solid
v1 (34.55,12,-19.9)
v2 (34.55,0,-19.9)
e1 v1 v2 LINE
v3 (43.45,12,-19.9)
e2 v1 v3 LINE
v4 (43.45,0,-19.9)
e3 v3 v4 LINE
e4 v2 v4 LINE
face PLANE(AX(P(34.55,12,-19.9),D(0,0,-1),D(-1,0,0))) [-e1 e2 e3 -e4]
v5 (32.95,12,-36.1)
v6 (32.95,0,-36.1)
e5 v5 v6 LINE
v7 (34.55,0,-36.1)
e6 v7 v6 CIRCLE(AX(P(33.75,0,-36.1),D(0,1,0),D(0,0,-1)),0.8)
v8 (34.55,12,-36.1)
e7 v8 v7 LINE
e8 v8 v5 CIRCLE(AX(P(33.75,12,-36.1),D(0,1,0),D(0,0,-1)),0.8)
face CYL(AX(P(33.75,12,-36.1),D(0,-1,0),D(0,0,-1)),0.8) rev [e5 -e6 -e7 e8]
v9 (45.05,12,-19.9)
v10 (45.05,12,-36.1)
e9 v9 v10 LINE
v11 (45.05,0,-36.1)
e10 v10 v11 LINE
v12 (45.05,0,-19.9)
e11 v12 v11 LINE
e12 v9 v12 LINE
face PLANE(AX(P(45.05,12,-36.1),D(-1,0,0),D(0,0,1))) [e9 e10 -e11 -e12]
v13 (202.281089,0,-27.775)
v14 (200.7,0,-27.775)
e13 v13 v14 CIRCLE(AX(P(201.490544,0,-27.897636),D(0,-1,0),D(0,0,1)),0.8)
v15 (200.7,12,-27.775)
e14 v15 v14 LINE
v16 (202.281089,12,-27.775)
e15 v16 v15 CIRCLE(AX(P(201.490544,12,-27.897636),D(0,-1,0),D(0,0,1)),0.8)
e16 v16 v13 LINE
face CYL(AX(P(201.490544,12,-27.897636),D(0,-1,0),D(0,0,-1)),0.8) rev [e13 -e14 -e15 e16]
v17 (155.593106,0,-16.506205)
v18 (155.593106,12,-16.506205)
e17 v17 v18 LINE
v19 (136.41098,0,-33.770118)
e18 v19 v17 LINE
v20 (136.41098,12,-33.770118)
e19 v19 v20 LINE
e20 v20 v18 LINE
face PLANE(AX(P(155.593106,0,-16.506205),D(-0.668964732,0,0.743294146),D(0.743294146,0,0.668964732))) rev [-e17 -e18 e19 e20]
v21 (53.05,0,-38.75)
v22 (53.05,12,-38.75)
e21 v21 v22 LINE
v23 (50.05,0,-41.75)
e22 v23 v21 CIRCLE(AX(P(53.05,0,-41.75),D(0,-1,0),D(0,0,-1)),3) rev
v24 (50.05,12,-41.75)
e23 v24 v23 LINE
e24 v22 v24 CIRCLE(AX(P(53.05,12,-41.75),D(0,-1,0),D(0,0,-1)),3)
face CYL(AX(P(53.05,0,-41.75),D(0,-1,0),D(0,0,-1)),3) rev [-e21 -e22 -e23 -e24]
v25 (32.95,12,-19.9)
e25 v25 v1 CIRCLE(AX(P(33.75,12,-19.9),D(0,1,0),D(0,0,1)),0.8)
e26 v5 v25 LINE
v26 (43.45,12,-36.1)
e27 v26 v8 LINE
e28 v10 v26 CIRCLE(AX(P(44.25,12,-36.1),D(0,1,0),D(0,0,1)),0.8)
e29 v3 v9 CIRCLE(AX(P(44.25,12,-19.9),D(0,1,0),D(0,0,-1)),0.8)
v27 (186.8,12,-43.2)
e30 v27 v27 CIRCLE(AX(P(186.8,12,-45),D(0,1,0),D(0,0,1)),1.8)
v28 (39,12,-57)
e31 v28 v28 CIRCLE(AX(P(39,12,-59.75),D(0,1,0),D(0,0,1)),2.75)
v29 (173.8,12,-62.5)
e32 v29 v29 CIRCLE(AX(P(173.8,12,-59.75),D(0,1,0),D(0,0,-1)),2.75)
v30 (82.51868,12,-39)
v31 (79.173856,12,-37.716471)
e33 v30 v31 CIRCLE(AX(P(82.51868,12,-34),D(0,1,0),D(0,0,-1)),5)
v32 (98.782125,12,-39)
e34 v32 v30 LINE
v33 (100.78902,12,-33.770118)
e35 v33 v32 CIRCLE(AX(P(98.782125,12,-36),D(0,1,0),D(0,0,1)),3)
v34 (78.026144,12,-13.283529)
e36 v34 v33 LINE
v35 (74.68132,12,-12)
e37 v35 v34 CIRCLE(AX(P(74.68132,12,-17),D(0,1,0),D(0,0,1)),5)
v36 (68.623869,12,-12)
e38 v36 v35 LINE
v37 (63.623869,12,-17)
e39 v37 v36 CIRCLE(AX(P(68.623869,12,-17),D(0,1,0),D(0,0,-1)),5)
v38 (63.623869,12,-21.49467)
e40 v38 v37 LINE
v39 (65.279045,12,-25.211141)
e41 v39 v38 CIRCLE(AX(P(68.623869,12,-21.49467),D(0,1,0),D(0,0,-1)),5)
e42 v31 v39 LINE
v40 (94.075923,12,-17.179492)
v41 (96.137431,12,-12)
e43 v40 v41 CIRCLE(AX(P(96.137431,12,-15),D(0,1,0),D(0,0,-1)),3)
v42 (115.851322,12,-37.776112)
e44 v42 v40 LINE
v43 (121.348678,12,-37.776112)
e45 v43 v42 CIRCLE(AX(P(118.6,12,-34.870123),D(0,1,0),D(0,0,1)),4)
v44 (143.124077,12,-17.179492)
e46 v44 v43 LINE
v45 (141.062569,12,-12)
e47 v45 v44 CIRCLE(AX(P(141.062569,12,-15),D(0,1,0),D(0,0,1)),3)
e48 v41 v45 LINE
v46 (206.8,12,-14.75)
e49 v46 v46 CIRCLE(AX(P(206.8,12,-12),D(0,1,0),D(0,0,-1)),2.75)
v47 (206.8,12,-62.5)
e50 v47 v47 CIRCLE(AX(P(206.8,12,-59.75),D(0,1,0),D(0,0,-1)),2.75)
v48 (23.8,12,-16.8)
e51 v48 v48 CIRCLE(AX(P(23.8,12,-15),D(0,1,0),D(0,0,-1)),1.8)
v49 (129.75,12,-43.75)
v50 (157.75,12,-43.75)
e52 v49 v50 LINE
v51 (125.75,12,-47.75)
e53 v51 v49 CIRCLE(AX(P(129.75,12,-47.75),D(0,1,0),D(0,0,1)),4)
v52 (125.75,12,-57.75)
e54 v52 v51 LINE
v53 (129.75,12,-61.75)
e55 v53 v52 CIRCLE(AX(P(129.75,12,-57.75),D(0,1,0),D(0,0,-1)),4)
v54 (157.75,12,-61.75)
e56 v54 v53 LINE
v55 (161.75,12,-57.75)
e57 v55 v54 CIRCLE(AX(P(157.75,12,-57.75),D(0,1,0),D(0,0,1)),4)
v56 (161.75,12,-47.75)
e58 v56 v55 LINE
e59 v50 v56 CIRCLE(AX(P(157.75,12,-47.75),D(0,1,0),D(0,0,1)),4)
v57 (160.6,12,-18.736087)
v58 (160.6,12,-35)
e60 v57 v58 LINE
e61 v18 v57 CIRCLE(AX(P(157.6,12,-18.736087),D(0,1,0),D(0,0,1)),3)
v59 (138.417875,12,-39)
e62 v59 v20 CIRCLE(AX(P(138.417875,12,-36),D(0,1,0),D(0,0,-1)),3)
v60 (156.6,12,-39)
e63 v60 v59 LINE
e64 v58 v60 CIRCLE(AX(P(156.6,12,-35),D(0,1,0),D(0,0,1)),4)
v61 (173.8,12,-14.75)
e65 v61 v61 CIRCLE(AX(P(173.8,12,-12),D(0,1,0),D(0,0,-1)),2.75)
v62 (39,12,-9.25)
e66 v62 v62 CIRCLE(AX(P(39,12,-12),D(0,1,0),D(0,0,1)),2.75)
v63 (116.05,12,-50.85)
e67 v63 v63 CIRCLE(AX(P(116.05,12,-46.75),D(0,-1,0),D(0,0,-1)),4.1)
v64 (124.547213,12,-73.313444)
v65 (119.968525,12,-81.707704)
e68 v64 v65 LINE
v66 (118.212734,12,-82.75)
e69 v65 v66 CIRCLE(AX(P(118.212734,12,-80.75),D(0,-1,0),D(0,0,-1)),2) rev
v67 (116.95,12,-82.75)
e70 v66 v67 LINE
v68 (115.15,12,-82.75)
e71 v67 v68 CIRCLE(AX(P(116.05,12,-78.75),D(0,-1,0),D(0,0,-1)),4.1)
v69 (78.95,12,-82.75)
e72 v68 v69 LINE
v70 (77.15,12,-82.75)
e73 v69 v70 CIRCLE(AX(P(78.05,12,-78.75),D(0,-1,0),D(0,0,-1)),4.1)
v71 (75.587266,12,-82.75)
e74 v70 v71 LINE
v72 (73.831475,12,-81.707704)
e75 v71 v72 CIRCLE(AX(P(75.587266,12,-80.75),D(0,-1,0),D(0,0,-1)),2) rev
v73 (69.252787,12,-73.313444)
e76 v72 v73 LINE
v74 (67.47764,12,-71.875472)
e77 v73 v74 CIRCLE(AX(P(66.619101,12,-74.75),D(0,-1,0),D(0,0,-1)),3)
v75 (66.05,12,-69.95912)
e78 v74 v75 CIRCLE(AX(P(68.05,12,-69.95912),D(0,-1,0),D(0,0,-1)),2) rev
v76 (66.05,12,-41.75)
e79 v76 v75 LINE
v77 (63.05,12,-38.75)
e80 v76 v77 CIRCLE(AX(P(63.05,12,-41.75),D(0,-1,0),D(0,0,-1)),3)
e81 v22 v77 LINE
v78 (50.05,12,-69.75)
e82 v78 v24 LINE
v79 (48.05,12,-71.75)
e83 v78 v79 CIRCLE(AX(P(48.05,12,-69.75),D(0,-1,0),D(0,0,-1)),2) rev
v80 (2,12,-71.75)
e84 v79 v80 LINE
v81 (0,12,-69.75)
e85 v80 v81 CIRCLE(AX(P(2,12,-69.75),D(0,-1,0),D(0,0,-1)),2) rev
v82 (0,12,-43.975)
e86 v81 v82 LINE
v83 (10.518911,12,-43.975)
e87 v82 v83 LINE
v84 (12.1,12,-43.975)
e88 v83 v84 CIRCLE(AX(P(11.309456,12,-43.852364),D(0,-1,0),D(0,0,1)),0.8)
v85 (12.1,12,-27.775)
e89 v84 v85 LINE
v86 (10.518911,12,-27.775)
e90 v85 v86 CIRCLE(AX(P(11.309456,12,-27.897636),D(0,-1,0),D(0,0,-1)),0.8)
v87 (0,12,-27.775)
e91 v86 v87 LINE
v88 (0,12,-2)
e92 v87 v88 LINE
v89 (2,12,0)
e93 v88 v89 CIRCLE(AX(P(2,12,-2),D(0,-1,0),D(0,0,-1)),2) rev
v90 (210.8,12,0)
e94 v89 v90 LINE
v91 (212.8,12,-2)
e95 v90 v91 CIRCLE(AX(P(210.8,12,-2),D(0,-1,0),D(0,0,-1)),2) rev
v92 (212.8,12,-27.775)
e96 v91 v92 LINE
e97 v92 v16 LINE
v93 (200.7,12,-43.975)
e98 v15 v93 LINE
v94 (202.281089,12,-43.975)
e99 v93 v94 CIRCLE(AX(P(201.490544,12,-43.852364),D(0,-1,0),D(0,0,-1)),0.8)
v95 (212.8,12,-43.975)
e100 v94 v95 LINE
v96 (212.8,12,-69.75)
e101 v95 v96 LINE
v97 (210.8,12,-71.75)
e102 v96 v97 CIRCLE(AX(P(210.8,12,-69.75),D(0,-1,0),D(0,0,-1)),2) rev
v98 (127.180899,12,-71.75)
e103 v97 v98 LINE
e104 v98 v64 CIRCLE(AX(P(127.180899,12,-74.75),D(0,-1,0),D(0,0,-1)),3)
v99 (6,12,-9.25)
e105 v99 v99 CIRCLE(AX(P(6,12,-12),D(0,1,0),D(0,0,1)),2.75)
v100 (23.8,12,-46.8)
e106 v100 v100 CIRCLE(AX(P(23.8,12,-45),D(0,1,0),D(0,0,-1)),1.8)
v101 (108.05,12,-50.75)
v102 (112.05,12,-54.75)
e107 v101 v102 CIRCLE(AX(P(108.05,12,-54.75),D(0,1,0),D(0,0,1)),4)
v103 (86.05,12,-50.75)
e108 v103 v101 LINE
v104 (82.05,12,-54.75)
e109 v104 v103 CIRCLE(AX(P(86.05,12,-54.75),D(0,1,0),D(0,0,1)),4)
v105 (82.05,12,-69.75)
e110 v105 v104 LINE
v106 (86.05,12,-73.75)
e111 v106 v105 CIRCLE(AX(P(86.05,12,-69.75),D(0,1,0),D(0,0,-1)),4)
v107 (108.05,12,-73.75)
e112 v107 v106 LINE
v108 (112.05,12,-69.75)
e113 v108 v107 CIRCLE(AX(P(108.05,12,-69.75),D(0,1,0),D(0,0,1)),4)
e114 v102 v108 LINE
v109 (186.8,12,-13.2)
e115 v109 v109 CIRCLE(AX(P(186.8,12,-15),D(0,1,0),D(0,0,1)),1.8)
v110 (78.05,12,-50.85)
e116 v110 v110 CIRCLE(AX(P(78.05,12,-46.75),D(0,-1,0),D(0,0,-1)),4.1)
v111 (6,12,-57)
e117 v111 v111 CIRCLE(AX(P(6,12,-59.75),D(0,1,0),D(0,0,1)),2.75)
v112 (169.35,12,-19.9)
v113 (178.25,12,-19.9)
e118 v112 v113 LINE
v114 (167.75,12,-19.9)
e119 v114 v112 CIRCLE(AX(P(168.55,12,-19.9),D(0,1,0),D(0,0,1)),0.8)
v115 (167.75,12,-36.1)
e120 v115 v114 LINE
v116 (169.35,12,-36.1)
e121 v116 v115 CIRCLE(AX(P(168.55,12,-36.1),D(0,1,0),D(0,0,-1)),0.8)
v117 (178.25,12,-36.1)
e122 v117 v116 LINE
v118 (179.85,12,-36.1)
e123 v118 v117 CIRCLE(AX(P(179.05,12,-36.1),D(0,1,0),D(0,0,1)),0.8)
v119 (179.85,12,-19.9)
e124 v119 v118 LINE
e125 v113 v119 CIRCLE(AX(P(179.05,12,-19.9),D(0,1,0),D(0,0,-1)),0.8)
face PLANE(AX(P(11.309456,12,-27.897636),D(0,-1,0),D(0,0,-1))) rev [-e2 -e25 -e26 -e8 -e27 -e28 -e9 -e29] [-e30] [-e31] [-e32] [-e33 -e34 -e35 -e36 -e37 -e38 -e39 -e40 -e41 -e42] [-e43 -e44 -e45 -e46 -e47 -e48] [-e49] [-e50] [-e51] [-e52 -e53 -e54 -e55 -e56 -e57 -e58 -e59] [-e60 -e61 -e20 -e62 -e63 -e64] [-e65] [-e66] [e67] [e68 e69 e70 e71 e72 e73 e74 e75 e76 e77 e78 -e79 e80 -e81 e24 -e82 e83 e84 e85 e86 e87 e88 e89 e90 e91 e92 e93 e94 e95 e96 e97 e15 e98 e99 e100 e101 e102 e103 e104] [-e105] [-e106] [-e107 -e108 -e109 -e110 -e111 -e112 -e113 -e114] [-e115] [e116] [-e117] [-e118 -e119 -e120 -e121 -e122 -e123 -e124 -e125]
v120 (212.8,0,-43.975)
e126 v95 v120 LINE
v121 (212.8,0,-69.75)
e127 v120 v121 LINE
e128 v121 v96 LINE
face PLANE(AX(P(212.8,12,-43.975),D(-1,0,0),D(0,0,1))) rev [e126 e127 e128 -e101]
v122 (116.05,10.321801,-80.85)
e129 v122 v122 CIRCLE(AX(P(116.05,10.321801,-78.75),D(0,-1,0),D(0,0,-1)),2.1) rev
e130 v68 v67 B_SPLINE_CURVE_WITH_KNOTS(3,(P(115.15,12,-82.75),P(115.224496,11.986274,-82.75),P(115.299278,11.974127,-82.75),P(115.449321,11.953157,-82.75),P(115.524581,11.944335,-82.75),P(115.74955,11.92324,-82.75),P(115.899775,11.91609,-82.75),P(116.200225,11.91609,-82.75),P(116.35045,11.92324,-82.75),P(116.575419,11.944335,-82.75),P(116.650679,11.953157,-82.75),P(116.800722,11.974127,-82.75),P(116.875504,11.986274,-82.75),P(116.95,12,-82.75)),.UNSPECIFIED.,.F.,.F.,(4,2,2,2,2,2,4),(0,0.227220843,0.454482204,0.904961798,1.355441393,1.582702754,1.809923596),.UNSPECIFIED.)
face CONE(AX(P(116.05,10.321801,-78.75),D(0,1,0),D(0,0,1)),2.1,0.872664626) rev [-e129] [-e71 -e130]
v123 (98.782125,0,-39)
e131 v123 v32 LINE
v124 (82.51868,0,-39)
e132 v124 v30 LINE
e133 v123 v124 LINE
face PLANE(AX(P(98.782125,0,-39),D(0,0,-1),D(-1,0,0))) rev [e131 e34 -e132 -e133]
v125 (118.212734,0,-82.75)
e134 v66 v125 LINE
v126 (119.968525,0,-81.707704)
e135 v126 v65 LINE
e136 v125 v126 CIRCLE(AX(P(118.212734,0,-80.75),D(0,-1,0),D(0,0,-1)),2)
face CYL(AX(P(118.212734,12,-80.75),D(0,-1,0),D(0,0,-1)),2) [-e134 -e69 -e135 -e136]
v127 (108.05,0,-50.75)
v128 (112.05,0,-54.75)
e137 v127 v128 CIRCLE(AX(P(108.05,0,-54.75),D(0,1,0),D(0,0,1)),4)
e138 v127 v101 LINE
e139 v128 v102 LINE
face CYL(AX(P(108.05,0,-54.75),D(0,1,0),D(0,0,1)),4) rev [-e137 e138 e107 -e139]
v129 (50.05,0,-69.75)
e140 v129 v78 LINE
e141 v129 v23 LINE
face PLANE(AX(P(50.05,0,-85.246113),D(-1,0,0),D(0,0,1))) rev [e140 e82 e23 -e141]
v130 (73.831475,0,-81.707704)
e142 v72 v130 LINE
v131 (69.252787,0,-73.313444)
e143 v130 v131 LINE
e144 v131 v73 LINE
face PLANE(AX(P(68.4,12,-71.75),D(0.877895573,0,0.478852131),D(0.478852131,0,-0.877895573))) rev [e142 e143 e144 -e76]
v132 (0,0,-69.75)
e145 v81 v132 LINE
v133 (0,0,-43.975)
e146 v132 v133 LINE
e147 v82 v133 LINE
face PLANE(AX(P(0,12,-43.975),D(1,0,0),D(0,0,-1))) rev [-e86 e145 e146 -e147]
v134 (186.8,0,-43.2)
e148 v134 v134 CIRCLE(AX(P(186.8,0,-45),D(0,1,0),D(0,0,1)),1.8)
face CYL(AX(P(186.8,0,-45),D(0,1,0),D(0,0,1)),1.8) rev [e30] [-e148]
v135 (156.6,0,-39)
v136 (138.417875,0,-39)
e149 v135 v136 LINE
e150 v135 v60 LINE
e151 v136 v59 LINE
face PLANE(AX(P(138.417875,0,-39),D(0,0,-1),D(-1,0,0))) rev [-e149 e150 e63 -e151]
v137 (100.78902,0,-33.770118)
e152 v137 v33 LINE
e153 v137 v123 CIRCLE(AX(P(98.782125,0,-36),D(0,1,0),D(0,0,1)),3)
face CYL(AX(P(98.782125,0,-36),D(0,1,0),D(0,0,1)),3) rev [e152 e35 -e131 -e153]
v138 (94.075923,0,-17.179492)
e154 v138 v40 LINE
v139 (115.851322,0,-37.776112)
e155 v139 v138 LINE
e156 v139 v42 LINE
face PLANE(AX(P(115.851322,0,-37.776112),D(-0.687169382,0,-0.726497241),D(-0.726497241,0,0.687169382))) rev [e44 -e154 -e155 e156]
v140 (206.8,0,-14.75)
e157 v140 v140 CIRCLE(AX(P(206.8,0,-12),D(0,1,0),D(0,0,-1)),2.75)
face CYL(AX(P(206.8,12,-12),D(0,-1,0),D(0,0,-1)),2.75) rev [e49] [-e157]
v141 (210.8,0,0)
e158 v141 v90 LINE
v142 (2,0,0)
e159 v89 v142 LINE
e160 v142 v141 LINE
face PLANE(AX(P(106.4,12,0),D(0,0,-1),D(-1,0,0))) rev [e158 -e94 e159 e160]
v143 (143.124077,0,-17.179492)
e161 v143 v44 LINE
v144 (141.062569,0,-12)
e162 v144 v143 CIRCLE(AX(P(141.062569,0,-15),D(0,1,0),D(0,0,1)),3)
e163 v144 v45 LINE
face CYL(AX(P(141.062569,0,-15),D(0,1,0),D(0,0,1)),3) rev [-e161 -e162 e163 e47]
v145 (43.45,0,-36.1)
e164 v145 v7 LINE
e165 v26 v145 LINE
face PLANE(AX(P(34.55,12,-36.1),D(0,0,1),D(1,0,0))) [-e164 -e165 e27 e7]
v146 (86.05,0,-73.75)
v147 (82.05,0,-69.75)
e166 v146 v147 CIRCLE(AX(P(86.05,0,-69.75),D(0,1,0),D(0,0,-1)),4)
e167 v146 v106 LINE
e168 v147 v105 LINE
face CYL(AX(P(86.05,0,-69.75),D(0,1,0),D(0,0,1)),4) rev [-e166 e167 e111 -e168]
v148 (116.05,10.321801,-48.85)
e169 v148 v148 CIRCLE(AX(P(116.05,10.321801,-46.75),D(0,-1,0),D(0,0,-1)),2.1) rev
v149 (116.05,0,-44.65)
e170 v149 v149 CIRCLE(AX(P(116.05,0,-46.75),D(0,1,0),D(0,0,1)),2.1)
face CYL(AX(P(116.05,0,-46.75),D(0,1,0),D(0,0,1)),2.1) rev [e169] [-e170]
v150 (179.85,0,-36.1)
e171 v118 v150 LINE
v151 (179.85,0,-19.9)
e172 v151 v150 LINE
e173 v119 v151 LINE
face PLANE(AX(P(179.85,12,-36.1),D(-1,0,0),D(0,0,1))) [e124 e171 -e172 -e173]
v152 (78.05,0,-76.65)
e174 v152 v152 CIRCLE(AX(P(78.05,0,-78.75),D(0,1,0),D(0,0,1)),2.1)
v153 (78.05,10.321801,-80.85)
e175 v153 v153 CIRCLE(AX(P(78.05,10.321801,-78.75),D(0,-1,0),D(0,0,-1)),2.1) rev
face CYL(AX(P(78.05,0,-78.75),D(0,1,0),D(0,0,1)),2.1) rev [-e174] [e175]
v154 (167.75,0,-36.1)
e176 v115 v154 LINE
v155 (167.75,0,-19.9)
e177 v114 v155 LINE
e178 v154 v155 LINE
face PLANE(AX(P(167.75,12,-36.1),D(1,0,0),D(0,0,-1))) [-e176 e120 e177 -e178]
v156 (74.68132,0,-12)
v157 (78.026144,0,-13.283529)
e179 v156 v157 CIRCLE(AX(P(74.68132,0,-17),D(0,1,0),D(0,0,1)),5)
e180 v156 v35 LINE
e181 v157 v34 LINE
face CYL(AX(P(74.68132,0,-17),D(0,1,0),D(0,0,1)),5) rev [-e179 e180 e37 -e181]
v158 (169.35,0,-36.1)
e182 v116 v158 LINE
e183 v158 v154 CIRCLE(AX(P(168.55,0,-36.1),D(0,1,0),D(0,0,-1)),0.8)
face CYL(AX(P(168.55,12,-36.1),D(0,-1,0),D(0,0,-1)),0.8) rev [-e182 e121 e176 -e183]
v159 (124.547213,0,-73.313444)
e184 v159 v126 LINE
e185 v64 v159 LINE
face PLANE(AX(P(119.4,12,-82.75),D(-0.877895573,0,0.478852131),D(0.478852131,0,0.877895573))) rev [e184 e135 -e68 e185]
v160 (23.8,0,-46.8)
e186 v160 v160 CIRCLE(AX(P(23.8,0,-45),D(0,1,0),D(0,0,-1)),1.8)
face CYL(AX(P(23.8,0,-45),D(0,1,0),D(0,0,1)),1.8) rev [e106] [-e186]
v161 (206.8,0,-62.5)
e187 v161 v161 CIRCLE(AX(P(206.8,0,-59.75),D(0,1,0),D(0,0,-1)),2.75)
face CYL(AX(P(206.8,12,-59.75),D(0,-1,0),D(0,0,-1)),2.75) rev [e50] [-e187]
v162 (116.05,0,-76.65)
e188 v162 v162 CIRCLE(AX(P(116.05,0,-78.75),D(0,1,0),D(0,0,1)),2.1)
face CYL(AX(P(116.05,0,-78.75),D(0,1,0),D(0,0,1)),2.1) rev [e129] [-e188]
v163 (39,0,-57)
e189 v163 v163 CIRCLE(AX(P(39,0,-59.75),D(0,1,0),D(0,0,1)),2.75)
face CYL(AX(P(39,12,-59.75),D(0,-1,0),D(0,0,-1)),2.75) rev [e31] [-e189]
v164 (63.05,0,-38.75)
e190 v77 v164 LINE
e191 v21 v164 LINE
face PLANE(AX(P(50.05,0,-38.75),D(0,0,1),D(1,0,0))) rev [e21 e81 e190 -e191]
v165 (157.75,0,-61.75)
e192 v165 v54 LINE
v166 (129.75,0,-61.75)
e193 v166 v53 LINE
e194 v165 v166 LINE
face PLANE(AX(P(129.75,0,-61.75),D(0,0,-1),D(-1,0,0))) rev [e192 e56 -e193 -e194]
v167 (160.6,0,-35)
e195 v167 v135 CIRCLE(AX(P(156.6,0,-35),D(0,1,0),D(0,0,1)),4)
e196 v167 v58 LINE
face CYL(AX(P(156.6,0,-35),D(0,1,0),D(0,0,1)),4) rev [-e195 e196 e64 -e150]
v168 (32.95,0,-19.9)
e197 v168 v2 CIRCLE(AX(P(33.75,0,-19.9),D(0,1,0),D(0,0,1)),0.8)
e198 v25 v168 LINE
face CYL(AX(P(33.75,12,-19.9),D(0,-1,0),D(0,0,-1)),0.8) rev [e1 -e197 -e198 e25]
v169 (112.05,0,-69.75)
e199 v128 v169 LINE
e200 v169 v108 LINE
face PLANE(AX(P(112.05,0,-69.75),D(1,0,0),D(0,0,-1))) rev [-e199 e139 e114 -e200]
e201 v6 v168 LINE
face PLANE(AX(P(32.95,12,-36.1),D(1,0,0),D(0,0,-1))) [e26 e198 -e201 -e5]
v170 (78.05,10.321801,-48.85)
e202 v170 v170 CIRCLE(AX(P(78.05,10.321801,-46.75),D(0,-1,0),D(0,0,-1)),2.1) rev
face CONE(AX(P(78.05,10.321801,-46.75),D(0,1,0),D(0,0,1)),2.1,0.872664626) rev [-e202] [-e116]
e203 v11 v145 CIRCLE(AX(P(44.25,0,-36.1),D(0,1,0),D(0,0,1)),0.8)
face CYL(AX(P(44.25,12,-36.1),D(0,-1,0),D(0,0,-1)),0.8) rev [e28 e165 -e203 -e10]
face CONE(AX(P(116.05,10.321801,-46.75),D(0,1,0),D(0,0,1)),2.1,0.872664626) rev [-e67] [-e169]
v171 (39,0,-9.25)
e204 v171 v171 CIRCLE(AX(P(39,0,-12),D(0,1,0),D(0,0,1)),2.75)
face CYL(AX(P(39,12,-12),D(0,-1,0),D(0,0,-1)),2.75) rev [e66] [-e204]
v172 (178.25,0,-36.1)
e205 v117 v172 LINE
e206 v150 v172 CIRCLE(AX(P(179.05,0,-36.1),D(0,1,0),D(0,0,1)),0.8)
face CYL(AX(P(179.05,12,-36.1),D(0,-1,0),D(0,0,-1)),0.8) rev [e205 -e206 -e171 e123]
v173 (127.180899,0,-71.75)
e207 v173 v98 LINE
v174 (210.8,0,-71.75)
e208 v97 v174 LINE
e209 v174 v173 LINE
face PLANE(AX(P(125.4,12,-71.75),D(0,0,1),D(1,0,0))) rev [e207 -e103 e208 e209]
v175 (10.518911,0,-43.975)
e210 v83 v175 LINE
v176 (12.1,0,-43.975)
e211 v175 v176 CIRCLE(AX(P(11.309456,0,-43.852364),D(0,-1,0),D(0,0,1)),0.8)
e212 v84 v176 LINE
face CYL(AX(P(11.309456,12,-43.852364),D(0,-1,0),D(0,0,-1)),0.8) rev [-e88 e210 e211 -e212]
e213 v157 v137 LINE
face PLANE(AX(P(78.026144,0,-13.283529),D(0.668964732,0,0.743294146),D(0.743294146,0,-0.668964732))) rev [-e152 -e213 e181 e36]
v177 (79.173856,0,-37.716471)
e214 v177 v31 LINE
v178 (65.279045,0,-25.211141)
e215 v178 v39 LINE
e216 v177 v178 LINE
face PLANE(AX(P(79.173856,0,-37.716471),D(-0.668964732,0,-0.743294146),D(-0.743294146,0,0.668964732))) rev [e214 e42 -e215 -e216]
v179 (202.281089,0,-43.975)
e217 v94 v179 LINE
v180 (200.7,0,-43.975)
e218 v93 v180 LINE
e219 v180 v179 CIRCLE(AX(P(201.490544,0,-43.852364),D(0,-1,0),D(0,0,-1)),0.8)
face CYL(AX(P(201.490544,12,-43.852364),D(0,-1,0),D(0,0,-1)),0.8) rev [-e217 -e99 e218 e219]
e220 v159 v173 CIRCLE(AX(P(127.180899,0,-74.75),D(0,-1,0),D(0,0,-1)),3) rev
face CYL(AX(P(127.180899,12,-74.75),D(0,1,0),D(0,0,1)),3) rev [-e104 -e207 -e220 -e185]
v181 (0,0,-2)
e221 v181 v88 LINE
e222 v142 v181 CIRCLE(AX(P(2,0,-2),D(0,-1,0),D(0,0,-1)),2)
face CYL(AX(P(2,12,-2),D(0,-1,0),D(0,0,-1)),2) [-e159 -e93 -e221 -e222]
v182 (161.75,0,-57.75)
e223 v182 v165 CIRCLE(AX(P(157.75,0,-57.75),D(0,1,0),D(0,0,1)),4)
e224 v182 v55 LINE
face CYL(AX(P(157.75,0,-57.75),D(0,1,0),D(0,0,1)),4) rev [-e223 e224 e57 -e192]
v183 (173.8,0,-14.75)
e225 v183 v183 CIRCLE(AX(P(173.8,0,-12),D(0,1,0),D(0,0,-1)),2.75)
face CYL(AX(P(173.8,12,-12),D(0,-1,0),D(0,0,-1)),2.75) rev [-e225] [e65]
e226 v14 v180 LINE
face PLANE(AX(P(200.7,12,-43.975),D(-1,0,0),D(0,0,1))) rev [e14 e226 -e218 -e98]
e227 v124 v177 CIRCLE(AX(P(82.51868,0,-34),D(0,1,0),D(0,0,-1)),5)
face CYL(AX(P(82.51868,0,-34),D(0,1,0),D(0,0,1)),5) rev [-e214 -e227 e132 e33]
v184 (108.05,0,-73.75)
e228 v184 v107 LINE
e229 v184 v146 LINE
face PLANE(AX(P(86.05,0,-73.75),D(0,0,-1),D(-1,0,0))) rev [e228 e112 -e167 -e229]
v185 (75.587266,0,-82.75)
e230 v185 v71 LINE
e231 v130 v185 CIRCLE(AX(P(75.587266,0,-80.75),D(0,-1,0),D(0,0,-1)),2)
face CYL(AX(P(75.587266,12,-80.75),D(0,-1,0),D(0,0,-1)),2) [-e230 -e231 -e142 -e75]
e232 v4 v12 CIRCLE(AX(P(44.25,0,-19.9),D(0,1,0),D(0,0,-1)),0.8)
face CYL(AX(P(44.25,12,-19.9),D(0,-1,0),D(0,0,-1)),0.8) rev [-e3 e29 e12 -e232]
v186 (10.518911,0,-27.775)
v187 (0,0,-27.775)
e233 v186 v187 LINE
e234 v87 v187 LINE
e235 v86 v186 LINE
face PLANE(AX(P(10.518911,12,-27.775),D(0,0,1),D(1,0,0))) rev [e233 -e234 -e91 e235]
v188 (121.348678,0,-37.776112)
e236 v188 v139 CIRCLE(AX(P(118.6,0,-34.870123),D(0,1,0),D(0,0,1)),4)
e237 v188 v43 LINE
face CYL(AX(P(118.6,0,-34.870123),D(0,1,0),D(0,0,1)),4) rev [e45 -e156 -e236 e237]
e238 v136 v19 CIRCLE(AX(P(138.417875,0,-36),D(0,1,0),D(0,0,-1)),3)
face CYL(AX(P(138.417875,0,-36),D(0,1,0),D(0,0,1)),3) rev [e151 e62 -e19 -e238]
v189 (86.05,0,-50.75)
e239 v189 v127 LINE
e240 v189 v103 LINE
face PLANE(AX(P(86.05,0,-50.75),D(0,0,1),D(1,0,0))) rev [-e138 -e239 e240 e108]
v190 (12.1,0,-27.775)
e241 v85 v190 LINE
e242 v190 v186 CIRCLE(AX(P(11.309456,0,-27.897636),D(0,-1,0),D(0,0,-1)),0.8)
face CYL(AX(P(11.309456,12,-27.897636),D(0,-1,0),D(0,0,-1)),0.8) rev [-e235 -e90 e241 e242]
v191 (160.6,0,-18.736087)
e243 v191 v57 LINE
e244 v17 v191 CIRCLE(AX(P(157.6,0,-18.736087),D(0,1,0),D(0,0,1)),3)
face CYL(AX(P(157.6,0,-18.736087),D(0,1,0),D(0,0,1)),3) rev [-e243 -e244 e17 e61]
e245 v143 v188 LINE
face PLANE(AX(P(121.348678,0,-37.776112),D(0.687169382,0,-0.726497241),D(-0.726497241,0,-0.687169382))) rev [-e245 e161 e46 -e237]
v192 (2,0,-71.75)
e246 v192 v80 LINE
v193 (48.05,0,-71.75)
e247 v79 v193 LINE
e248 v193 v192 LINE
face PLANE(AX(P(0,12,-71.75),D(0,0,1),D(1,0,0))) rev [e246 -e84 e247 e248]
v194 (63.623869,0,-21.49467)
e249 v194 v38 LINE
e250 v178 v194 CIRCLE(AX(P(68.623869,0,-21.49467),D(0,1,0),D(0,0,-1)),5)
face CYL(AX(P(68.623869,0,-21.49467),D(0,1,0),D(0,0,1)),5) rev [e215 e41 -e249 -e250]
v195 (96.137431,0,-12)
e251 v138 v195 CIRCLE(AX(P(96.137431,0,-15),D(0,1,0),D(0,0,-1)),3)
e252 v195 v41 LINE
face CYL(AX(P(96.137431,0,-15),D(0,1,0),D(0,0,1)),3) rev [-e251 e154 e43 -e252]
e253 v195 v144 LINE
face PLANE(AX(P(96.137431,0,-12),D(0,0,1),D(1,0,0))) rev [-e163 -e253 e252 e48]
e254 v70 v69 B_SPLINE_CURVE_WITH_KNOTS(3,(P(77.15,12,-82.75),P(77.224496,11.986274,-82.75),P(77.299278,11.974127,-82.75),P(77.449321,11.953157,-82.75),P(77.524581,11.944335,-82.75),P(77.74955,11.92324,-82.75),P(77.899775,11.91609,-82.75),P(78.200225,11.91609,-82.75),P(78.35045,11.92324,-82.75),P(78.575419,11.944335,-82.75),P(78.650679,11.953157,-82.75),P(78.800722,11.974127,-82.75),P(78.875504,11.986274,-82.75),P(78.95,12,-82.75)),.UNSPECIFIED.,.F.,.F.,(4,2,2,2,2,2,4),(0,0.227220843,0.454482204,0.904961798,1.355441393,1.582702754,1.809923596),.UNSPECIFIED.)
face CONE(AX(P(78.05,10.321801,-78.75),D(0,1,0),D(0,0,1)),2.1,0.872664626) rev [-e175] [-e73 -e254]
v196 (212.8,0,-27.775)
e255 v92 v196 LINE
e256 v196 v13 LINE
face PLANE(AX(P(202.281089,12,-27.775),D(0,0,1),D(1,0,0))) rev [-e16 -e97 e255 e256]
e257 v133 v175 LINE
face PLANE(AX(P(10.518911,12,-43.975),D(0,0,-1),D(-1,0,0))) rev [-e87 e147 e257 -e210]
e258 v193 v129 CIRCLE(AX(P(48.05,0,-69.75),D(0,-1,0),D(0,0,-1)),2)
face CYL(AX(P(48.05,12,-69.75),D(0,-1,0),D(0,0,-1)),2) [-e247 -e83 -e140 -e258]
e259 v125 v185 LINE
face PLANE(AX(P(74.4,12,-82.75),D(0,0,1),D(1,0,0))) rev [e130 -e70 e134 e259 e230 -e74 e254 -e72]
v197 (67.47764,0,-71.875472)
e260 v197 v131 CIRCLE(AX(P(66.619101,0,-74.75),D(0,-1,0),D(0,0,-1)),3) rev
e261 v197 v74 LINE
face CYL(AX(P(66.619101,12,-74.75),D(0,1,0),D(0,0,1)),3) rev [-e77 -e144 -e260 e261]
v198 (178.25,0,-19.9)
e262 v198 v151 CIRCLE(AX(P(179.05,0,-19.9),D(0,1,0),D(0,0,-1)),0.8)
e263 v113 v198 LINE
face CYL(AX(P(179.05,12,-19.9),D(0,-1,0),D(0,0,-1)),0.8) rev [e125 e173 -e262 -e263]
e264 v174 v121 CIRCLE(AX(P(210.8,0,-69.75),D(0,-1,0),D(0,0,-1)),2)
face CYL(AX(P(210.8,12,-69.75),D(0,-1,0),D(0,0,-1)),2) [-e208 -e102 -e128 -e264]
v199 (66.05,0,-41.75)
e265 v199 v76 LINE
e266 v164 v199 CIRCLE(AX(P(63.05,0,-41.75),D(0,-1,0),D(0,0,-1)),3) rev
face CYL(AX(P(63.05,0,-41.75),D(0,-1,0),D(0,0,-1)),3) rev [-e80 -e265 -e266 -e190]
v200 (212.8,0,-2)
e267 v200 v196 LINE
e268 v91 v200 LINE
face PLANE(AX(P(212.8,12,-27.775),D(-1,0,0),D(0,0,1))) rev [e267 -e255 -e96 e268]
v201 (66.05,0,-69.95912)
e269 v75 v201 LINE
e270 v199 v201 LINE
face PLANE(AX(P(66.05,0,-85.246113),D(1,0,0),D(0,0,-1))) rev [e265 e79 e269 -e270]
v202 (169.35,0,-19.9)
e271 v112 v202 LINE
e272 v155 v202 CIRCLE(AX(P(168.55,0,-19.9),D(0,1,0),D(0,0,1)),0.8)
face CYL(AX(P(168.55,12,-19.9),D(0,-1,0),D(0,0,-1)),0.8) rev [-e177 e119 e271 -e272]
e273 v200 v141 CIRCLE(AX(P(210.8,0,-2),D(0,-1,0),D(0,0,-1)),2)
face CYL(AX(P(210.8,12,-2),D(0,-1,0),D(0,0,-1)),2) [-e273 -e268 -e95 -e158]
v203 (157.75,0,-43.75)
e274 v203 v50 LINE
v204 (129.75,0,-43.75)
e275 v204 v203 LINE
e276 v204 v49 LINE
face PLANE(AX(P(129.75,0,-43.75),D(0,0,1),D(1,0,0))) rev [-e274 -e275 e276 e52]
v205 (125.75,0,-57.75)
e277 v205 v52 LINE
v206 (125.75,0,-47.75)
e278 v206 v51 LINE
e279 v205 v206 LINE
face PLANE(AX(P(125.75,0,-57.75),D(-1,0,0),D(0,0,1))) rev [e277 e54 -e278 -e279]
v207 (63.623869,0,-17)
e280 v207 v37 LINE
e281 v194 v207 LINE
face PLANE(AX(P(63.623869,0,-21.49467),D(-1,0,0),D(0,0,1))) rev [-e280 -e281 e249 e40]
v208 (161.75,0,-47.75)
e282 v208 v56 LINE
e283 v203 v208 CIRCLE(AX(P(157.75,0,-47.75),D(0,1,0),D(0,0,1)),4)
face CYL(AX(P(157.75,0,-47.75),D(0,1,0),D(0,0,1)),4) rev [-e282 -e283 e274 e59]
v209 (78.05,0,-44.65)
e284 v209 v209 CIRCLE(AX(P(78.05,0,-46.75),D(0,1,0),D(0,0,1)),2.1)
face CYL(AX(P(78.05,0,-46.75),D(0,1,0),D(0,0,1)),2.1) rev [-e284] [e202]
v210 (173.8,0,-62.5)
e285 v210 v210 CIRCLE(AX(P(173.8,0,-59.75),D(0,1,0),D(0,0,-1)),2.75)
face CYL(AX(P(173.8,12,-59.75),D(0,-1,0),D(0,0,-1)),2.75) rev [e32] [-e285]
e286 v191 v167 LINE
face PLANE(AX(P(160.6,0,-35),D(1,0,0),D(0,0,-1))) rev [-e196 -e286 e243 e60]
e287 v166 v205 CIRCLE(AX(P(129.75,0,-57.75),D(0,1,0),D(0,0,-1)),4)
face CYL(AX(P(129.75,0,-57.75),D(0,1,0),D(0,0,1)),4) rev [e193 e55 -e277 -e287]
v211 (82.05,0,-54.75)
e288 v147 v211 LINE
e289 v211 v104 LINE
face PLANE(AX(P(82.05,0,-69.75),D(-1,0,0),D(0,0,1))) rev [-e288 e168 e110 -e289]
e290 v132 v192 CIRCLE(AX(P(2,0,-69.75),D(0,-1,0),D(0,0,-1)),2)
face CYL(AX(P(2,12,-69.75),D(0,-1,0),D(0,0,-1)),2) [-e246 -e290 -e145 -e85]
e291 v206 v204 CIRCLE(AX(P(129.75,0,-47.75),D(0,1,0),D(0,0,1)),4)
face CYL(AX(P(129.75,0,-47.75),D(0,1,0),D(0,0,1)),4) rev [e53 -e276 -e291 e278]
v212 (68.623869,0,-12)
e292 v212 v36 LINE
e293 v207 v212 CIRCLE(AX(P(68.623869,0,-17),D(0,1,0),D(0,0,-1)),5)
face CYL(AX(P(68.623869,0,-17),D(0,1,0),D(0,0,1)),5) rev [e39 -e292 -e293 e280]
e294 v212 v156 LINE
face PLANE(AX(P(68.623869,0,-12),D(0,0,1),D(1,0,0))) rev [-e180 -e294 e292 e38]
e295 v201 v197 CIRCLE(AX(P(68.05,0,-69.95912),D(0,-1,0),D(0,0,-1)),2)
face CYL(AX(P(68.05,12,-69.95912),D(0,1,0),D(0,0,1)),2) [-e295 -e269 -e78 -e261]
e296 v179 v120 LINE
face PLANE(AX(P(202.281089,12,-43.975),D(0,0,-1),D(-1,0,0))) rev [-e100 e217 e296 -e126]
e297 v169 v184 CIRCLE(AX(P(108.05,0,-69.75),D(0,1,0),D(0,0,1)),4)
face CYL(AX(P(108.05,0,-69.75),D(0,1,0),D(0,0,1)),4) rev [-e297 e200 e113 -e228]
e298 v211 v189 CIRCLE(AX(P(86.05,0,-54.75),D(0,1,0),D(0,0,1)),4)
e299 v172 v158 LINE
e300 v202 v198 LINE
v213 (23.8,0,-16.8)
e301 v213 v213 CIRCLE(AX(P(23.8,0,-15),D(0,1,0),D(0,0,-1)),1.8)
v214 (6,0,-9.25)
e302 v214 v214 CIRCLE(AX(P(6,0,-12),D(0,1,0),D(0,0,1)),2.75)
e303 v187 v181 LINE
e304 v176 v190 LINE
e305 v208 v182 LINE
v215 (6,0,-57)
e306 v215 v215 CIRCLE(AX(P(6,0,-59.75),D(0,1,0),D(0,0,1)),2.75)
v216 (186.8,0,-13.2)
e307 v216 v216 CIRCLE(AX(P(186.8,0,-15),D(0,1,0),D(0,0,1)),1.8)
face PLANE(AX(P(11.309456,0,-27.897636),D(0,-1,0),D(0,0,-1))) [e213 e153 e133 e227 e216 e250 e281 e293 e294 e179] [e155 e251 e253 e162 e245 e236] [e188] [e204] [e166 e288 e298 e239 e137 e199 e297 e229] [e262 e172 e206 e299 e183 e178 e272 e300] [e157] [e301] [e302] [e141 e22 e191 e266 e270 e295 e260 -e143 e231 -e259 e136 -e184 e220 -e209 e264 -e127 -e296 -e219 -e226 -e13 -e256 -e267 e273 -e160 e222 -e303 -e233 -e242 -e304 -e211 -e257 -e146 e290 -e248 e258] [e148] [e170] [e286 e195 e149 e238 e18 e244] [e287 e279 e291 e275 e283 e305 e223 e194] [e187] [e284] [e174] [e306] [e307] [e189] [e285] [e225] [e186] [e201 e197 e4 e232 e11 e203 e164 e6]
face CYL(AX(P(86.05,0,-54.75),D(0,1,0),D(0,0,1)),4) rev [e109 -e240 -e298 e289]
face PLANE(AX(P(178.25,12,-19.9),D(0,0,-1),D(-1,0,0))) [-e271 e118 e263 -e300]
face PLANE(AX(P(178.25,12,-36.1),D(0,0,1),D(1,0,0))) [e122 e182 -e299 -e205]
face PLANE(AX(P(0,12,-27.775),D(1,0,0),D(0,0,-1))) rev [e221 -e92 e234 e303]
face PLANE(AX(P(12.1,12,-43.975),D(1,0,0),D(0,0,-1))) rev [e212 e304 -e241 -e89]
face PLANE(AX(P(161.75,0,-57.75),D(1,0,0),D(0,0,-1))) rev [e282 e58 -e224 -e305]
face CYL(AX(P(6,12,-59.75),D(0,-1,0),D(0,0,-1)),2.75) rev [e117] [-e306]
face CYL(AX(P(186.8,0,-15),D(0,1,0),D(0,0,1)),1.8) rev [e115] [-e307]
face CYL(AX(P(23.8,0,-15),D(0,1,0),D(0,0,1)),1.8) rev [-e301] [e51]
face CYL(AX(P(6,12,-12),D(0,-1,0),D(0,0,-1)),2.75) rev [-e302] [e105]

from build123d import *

# Parameters (mm, degrees)
SKETCH1_R           = 2.75
BOSS_EXTRUDE1_DEPTH = 12
SKETCH2_W           = 16
SKETCH2_H           = 46.496113018
CUT_EXTRUDE1_DEPTH  = 229.638147517
SKETCH3_R           = 2.1
CUT_EXTRUDE2_DEPTH  = 229.638147517
CUT_EXTRUDE3_DEPTH  = 229.638147517
FILLET1_R           = 3
FILLET2_R           = 2
SKETCH6_R           = 1.8
CUT_EXTRUDE4_DEPTH  = 229.638147652
CHAMFER1_SIZE       = 1.678199262
CHAMFER1_SIZE_2     = 2


with BuildPart() as part:
    # Sketch1 → Boss-Extrude1 (new body)
    with BuildSketch(Plane(origin=(0, 0, 0), x_dir=(1, 0, 0), z_dir=(0, 1, 0))):
        with BuildLine():
            Line((0, 71.75), (68.4, 71.75))
            Line((68.4, 71.75), (74.4, 82.75))
            Line((74.4, 82.75), (119.4, 82.75))
            Line((119.4, 82.75), (125.4, 71.75))
            Line((125.4, 71.75), (212.8, 71.75))
            Line((212.8, 71.75), (212.8, 43.975))
            Line((212.8, 43.975), (202.281088693, 43.975))
            ThreePointArc((202.281088693, 43.975), (201.490544346, 44.652363805), (200.7, 43.975))
            Line((200.7, 43.975), (200.7, 27.775))
            ThreePointArc((200.7, 27.775), (201.490544346, 27.097636195), (202.281088693, 27.775))
            Line((202.281088693, 27.775), (212.8, 27.775))
            Line((212.8, 27.775), (212.8, 0))
            Line((212.8, 0), (106.4, 0))
            Line((106.4, 0), (0, 0))
            Line((0, 0), (0, 27.775))
            Line((0, 27.775), (10.518911307, 27.775))
            ThreePointArc((10.518911307, 27.775), (11.309455654, 27.097636195), (12.1, 27.775))
            Line((12.1, 27.775), (12.1, 43.975))
            ThreePointArc((12.1, 43.975), (11.309455654, 44.652363805), (10.518911307, 43.975))
            Line((10.518911307, 43.975), (0, 43.975))
            Line((0, 43.975), (0, 71.75))
        make_face()
        with Locations(Location((39, 59.75, 0), (0, 0, 270))):
            Circle(SKETCH1_R, mode=Mode.SUBTRACT)
        with Locations(Location((39, 12, 0), (0, 0, 270))):
            Circle(SKETCH1_R, mode=Mode.SUBTRACT)
        with Locations(Location((173.8, 59.75, 0), (0, 0, 90))):
            Circle(SKETCH1_R, mode=Mode.SUBTRACT)
        with Locations(Location((173.8, 12, 0), (0, 0, 90))):
            Circle(SKETCH1_R, mode=Mode.SUBTRACT)
        with Locations(Location((6, 12, 0), (0, 0, 270))):
            Circle(SKETCH1_R, mode=Mode.SUBTRACT)
        with Locations(Location((6, 59.75, 0), (0, 0, 270))):
            Circle(SKETCH1_R, mode=Mode.SUBTRACT)
        with Locations(Location((206.8, 59.75, 0), (0, 0, 90))):
            Circle(SKETCH1_R, mode=Mode.SUBTRACT)
        with Locations(Location((206.8, 12, 0), (0, 0, 90))):
            Circle(SKETCH1_R, mode=Mode.SUBTRACT)
        with BuildLine():
            Line((32.95, 36.1), (32.95, 19.9))
            ThreePointArc((32.95, 19.9), (33.75, 19.1), (34.55, 19.9))
            Line((34.55, 19.9), (43.45, 19.9))
            ThreePointArc((43.45, 19.9), (44.25, 19.1), (45.05, 19.9))
            Line((45.05, 19.9), (45.05, 36.1))
            ThreePointArc((45.05, 36.1), (44.25, 36.9), (43.45, 36.1))
            Line((43.45, 36.1), (34.55, 36.1))
            ThreePointArc((34.55, 36.1), (33.75, 36.9), (32.95, 36.1))
        make_face(mode=Mode.SUBTRACT)
        with BuildLine():
            Line((179.85, 36.1), (179.85, 19.9))
            ThreePointArc((179.85, 19.9), (179.05, 19.1), (178.25, 19.9))
            Line((178.25, 19.9), (169.35, 19.9))
            ThreePointArc((169.35, 19.9), (168.55, 19.1), (167.75, 19.9))
            Line((167.75, 19.9), (167.75, 36.1))
            ThreePointArc((167.75, 36.1), (168.55, 36.9), (169.35, 36.1))
            Line((169.35, 36.1), (178.25, 36.1))
            ThreePointArc((178.25, 36.1), (179.05, 36.9), (179.85, 36.1))
        make_face(mode=Mode.SUBTRACT)
    extrude(amount=BOSS_EXTRUDE1_DEPTH)

    # Sketch2 → Cut-Extrude1 (cut, through all)
    with BuildSketch(Plane(origin=(0, 12, 0), x_dir=(1, 0, 0), z_dir=(0, 1, 0))):
        with Locations((58.05, 61.998056509)):
            Rectangle(SKETCH2_W, SKETCH2_H)
    extrude(amount=-CUT_EXTRUDE1_DEPTH, mode=Mode.SUBTRACT)

    # Sketch3 → Cut-Extrude2 (cut, through all)
    with BuildSketch(Plane(origin=(0, 12, 0), x_dir=(1, 0, 0), z_dir=(0, 1, 0))):
        with Locations(Location((78.05, 78.75, 0), (0, 0, 270))):
            Circle(SKETCH3_R)
        with Locations(Location((78.05, 46.75, 0), (0, 0, 270))):
            Circle(SKETCH3_R)
        with Locations(Location((116.05, 78.75, 0), (0, 0, 270))):
            Circle(SKETCH3_R)
        with Locations(Location((116.05, 46.75, 0), (0, 0, 270))):
            Circle(SKETCH3_R)
    extrude(amount=-CUT_EXTRUDE2_DEPTH, mode=Mode.SUBTRACT)

    # Sketch5 → Cut-Extrude3 (cut, through all)
    with BuildSketch(Plane(origin=(0, 12, 0), x_dir=(1, 0, 0), z_dir=(0, 1, 0))):
        with BuildLine():
            Line((98.782125318, 39), (82.518680026, 39))
            ThreePointArc((82.518680026, 39), (80.72736119, 38.668102058), (79.173856368, 37.716470731))
            Line((79.173856368, 37.716470731), (65.279045214, 25.211140692))
            ThreePointArc((65.279045214, 25.211140692), (64.056368555, 23.528862886), (63.623868872, 21.494669961))
            Line((63.623868872, 21.494669961), (63.623868872, 17))
            ThreePointArc((63.623868872, 17), (65.088334966, 13.464466094), (68.623868872, 12))
            Line((68.623868872, 12), (74.681319974, 12))
            ThreePointArc((74.681319974, 12), (76.47263881, 12.331897942), (78.026143632, 13.283529269))
            Line((78.026143632, 13.283529269), (100.789019513, 33.770117561))
            ThreePointArc((100.789019513, 33.770117561), (101.582986553, 37.074791302), (98.782125318, 39))
        make_face()
        with BuildLine():
            Line((115.851322474, 37.77611222), (94.075922745, 17.179491723))
            ThreePointArc((94.075922745, 17.179491723), (93.350095678, 13.890602679), (96.13743089, 12))
            Line((96.13743089, 12), (141.06256911, 12))
            ThreePointArc((141.06256911, 12), (143.849904322, 13.890602679), (143.124077255, 17.179491723))
            Line((143.124077255, 17.179491723), (121.348677526, 37.77611222))
            ThreePointArc((121.348677526, 37.77611222), (118.6, 38.870123257), (115.851322474, 37.77611222))
        make_face()
        with BuildLine():
            Line((138.417874682, 39), (156.6, 39))
            ThreePointArc((156.6, 39), (159.428427125, 37.828427125), (160.6, 35))
            Line((160.6, 35), (160.6, 18.736087214))
            ThreePointArc((160.6, 18.736087214), (158.820515755, 15.995587024), (155.593105805, 16.506204775))
            Line((155.593105805, 16.506204775), (136.410980487, 33.770117561))
            ThreePointArc((136.410980487, 33.770117561), (135.617013447, 37.074791302), (138.417874682, 39))
        make_face()
        with BuildLine():
            Line((86.05, 73.75), (108.05, 73.75))
            ThreePointArc((108.05, 73.75), (110.878427125, 72.578427125), (112.05, 69.75))
            Line((112.05, 69.75), (112.05, 54.75))
            ThreePointArc((112.05, 54.75), (110.878427125, 51.921572875), (108.05, 50.75))
            Line((108.05, 50.75), (86.05, 50.75))
            ThreePointArc((86.05, 50.75), (83.221572875, 51.921572875), (82.05, 54.75))
            Line((82.05, 54.75), (82.05, 69.75))
            ThreePointArc((82.05, 69.75), (83.221572875, 72.578427125), (86.05, 73.75))
        make_face()
        with BuildLine():
            Line((129.75, 61.75), (157.75, 61.75))
            ThreePointArc((157.75, 61.75), (160.578427125, 60.578427125), (161.75, 57.75))
            Line((161.75, 57.75), (161.75, 47.75))
            ThreePointArc((161.75, 47.75), (160.578427125, 44.921572875), (157.75, 43.75))
            Line((157.75, 43.75), (129.75, 43.75))
            ThreePointArc((129.75, 43.75), (126.921572875, 44.921572875), (125.75, 47.75))
            Line((125.75, 47.75), (125.75, 57.75))
            ThreePointArc((125.75, 57.75), (126.921572875, 60.578427125), (129.75, 61.75))
        make_face()
    extrude(amount=-CUT_EXTRUDE3_DEPTH, mode=Mode.SUBTRACT)

    # Fillet1
    fillet1_edges = [part.edges().sort_by_distance(p)[0] for p in [
        (50.05, 6, -38.75),
        (66.05, 6, -38.75),
        (68.4, 6, -71.75),
        (125.4, 6, -71.75),
    ]]
    fillet(fillet1_edges, radius=FILLET1_R)

    # Fillet2
    fillet2_edges = [part.edges().sort_by_distance(p)[0] for p in [
        (212.8, 6, -71.75),
        (119.4, 6, -82.75),
        (74.4, 6, -82.75),
        (50.05, 6, -71.75),
        (66.05, 6, -71.75),
        (0, 6, -71.75),
        (212.8, 6, 0),
        (0, 6, 0),
    ]]
    fillet(fillet2_edges, radius=FILLET2_R)

    # Sketch6 → Cut-Extrude4 (cut, through all)
    with BuildSketch(Plane(origin=(0, 12, 0), x_dir=(1, 0, 0), z_dir=(0, 1, 0))):
        with Locations(Location((186.8, 45, 0), (0, 0, 270))):
            Circle(SKETCH6_R)
        with Locations(Location((186.8, 15, 0), (0, 0, 270))):
            Circle(SKETCH6_R)
        with Locations(Location((23.8, 45, 0), (0, 0, 90))):
            Circle(SKETCH6_R)
        with Locations(Location((23.8, 15, 0), (0, 0, 90))):
            Circle(SKETCH6_R)
    extrude(amount=-CUT_EXTRUDE4_DEPTH, mode=Mode.SUBTRACT)

    # Chamfer1
    # the kernel refuses this chamfer: 2, 1.678199262 mm, written as the material it takes off along each edge
    with BuildSketch(Plane(origin=(78.05, 12, -46.75), x_dir=(0, 0, 1), z_dir=(-1, 0, 0))) as chamfer1_piece_1:
        Polygon((2.1, -CHAMFER1_SIZE), (2.1 + CHAMFER1_SIZE_2, 0), (2.1, 0), align=None)
    revolve(axis=Axis((78.05, 12, -46.75), (0, 1, 0)), mode=Mode.SUBTRACT)
    with BuildSketch(Plane(origin=(116.05, 12, -78.75), x_dir=(0, 0, 1), z_dir=(-1, 0, 0))) as chamfer1_piece_2:
        Polygon((2.1, -CHAMFER1_SIZE), (2.1 + CHAMFER1_SIZE_2, 0), (2.1, 0), align=None)
    revolve(axis=Axis((116.05, 12, -78.75), (0, 1, 0)), mode=Mode.SUBTRACT)
    with BuildSketch(Plane(origin=(116.05, 12, -46.75), x_dir=(0, 0, 1), z_dir=(-1, 0, 0))) as chamfer1_piece_3:
        Polygon((2.1, -CHAMFER1_SIZE), (2.1 + CHAMFER1_SIZE_2, 0), (2.1, 0), align=None)
    revolve(axis=Axis((116.05, 12, -46.75), (0, 1, 0)), mode=Mode.SUBTRACT)
    with BuildSketch(Plane(origin=(78.05, 12, -78.75), x_dir=(0, 0, 1), z_dir=(-1, 0, 0))) as chamfer1_piece_4:
        Polygon((2.1, -CHAMFER1_SIZE), (2.1 + CHAMFER1_SIZE_2, 0), (2.1, 0), align=None)
    revolve(axis=Axis((78.05, 12, -78.75), (0, 1, 0)), mode=Mode.SUBTRACT)


solid = part.part
